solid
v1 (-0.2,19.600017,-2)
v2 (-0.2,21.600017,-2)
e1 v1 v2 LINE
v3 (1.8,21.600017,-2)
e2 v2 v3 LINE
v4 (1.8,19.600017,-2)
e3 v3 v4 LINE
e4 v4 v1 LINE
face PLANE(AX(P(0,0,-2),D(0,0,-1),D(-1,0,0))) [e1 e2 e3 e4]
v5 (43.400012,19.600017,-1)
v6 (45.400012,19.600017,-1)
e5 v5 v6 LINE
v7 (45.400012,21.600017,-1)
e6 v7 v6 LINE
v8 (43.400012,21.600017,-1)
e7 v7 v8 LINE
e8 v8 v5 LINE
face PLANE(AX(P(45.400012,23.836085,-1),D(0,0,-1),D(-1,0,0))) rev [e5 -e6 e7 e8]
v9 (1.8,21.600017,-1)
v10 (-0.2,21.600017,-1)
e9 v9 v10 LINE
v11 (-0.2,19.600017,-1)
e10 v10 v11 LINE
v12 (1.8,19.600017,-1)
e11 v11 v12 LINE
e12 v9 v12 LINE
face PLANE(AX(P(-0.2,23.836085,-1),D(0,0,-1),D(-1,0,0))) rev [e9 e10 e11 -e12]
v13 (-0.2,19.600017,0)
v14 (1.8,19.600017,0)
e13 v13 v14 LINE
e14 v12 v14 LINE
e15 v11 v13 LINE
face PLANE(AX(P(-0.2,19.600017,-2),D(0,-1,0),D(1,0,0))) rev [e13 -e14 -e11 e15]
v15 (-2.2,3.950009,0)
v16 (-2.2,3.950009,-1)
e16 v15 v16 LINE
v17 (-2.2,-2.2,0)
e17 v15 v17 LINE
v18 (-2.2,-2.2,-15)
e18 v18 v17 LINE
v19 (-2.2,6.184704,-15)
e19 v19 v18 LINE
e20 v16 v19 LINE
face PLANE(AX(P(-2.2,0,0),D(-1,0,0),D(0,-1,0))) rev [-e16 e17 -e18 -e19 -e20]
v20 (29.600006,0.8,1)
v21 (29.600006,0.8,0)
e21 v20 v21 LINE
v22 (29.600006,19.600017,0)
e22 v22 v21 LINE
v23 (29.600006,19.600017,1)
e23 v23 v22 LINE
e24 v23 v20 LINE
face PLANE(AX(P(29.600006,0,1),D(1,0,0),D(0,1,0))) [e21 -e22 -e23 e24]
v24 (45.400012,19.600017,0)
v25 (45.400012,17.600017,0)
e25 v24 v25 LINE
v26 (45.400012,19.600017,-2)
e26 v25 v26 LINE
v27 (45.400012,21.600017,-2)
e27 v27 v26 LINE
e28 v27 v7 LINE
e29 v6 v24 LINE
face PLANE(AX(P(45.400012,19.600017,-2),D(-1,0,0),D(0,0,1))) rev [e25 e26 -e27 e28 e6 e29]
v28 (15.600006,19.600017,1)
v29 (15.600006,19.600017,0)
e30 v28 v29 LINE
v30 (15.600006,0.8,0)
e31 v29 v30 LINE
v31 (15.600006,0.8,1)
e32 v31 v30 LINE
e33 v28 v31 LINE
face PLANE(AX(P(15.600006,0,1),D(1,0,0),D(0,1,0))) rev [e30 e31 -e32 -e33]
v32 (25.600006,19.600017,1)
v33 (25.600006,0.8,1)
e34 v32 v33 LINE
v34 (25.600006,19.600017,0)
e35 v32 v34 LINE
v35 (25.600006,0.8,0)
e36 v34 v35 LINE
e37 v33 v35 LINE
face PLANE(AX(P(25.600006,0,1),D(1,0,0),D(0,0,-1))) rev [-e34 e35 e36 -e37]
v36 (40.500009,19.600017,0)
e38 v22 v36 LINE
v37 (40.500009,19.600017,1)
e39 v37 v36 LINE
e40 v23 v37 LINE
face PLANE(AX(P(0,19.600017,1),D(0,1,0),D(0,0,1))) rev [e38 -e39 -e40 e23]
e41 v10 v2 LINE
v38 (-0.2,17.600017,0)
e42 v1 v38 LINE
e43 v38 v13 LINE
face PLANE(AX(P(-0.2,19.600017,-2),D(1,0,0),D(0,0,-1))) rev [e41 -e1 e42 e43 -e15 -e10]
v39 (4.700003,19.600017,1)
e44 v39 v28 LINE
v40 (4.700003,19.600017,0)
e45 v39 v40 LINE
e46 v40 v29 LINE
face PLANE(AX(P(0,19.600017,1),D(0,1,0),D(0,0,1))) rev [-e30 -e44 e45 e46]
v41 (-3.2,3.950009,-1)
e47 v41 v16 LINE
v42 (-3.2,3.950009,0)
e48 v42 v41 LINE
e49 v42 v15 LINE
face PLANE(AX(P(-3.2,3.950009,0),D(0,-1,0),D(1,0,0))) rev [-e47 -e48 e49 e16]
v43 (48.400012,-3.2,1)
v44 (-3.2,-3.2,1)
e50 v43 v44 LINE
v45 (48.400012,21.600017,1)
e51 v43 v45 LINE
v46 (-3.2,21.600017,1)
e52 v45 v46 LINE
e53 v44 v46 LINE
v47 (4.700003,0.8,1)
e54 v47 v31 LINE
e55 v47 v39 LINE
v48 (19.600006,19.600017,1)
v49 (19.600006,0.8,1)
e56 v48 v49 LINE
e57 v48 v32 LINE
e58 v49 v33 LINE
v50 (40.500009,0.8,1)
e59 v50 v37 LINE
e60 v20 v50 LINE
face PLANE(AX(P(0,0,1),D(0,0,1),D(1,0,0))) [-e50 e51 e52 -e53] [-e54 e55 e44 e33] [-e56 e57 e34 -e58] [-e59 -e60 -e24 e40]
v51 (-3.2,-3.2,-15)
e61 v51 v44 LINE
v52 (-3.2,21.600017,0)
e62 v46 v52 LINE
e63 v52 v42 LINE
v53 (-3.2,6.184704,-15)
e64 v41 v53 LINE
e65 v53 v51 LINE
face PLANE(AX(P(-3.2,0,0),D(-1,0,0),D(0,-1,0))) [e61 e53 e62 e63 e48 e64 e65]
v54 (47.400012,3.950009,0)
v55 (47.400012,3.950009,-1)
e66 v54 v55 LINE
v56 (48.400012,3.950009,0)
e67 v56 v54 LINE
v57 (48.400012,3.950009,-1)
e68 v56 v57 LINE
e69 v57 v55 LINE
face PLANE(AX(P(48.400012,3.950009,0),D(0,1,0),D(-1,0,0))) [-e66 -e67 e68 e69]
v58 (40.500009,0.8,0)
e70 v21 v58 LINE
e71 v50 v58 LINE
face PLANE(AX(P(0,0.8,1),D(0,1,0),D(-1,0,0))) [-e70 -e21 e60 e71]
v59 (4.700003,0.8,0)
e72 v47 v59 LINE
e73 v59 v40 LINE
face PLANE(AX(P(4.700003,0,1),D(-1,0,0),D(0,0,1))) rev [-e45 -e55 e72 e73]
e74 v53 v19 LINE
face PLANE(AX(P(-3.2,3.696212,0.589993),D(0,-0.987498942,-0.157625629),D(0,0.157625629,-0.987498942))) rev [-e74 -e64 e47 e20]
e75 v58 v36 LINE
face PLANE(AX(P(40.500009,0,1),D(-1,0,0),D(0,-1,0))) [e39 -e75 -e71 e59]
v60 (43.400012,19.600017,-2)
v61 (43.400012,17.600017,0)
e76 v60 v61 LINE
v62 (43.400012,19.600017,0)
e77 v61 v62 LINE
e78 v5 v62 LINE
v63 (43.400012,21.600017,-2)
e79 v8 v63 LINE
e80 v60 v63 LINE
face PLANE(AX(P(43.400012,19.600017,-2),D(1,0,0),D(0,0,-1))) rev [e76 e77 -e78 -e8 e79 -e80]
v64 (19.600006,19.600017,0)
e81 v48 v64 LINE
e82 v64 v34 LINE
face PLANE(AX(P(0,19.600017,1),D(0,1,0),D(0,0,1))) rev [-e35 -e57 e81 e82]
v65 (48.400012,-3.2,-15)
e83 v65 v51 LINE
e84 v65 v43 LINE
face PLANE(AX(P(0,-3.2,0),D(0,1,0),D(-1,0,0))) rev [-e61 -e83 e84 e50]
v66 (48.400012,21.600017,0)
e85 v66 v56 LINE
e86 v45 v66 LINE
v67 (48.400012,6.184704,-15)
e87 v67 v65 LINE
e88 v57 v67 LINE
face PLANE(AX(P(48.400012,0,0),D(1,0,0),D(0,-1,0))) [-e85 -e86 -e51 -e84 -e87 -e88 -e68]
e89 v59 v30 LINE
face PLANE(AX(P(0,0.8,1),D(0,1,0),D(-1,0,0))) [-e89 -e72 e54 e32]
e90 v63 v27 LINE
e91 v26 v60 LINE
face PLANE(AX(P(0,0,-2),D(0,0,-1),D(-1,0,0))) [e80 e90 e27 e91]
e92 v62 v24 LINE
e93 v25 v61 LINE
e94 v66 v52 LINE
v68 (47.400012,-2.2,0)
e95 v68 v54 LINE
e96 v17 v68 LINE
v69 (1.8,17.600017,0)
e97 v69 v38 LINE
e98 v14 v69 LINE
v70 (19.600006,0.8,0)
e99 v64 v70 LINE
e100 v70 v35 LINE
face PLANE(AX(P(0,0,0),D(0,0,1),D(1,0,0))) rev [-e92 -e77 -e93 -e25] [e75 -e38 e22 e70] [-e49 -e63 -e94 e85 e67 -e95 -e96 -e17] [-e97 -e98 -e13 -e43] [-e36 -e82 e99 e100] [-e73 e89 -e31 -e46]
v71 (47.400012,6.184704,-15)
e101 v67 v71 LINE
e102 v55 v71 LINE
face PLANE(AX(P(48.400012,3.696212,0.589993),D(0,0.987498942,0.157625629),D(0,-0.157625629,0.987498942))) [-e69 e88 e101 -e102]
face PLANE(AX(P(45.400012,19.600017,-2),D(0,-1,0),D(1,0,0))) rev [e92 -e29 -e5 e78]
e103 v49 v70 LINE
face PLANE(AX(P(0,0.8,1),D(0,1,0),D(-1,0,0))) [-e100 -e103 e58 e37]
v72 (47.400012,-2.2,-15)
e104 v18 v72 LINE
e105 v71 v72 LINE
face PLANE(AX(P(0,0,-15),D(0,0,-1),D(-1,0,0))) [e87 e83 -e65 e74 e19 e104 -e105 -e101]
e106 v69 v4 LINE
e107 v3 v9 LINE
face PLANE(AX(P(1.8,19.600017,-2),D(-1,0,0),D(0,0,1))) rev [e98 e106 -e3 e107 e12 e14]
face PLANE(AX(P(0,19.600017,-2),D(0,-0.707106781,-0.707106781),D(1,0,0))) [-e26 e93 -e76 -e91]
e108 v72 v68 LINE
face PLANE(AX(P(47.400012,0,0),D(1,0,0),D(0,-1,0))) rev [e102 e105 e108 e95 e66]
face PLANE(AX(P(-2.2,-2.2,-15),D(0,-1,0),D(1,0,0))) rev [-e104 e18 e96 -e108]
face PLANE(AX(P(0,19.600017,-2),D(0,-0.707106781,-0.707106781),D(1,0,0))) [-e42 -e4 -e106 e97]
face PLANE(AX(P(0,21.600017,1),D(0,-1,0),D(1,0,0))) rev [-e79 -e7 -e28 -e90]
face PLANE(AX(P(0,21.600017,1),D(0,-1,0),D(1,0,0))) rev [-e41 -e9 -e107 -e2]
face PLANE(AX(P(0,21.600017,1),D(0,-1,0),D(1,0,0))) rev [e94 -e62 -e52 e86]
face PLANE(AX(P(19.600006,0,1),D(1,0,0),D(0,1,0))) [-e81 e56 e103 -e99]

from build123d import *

# Parameters (mm, degrees)
SKETCH_2_W      = 49.600012207
SKETCH_2_H      = 22.800017408
SKETCH_2_W_2    = 10.900003052
SKETCH_2_H_2    = 18.800017408
SKETCH_2_W_3    = 6
SKETCH_2_W_4    = 10.900003051
EXTRUDE_1_DEPTH = 1
SKETCH_4_W      = 49.600012207
SKETCH_4_H      = 1
EXTRUDE_2_DEPTH = 2
SKETCH_5_W      = 49.600012207
SKETCH_5_H      = 1
EXTRUDE_3_DEPTH = 15
SKETCH_6_W      = 1
SKETCH_6_H      = 17.650008704
EXTRUDE_6_DEPTH = 1
SKETCH_7_W      = 2
SKETCH_7_H      = 2
EXTRUDE_7_DEPTH = 2
SKETCH_8_W      = 2
SKETCH_8_H      = 1
EXTRUDE_8_DEPTH = 2
CHAMFER_1_SIZE  = 2


with BuildPart() as part:
    # Эскиз2 → Бобышка-Вытянуть1 (new body)
    with BuildSketch(Plane.XY):
        with Locations((22.600006104, 10.200008704)):
            Rectangle(SKETCH_2_W, SKETCH_2_H)
        with Locations((10.150004578, 10.200008704)):
            Rectangle(SKETCH_2_W_2, SKETCH_2_H_2, mode=Mode.SUBTRACT)
        with Locations((22.600006104, 10.200008704)):
            Rectangle(SKETCH_2_W_3, SKETCH_2_H_2, mode=Mode.SUBTRACT)
        with Locations((35.05000763, 10.200008704)):
            Rectangle(SKETCH_2_W_4, SKETCH_2_H_2, mode=Mode.SUBTRACT)
    extrude(amount=EXTRUDE_1_DEPTH)

    # Эскиз4 → Бобышка-Вытянуть2 (add)
    with BuildSketch(Plane.XZ.offset(1.2)):
        with Locations((22.600006104, 0.5)):
            Rectangle(SKETCH_4_W, SKETCH_4_H)
    extrude(amount=EXTRUDE_2_DEPTH)

    # Эскиз5 → Бобышка-Вытянуть3 (add)
    with BuildSketch(Plane(origin=(0, 0, 0), x_dir=(-1, 0, 0), z_dir=(0, 0, -1))):
        with Locations((-22.600006104, -2.7)):
            Rectangle(SKETCH_5_W, SKETCH_5_H)
    extrude(amount=EXTRUDE_3_DEPTH)

    # Эскиз6 → Бобышка-Вытянуть6 (add)
    with BuildSketch(Plane.ZY.offset(2.2)):
        with Locations((0.5, 12.775013056)):
            Rectangle(SKETCH_6_W, SKETCH_6_H)
        Polygon((1, 3.950008704), (0, 3.950008704), (0, -2.2), (-15, -2.2), (-15, -3.2), (1, -3.2), align=None)
        Polygon((0, -2.2), (0, 3.950008704), (-1, 3.950008704), (-15, 6.184703554), (-15, -2.2), align=None)
    extrude_6 = extrude(amount=EXTRUDE_6_DEPTH)

    # Зеркальное отражение1: Бобышка-Вытянуть6 across plane
    add(extrude_6.mirror(Plane.ZY.offset(-22.600006104)))

    # Эскиз7 → Бобышка-Вытянуть7 (add)
    with BuildSketch(Plane(origin=(0, 0, 0), x_dir=(-1, 0, 0), z_dir=(0, 0, -1))):
        with Locations((-44.400012207, 18.600017408)):
            Rectangle(SKETCH_7_W, SKETCH_7_H)
        with Locations((-0.8, 18.600017408)):
            Rectangle(SKETCH_7_W, SKETCH_7_H)
    extrude(amount=EXTRUDE_7_DEPTH)

    # Эскиз8 → Бобышка-Вытянуть8 (add)
    with BuildSketch(Plane(origin=(0, 19.600017408, 0), x_dir=(1, 0, 0), z_dir=(0, 1, 0))):
        with Locations((0.8, 1.5)):
            Rectangle(SKETCH_8_W, SKETCH_8_H)
        with Locations((44.400012207, 1.5)):
            Rectangle(SKETCH_8_W, SKETCH_8_H)
    extrude(amount=EXTRUDE_8_DEPTH)

    # Фаска1
    chamfer_1_edges = [part.edges().sort_by_distance(p)[0] for p in [
        (0.8, 17.600017408, -2),
        (44.400012207, 17.600017408, -2),
    ]]
    chamfer(chamfer_1_edges, length=CHAMFER_1_SIZE - 0.0001)  # a hair under: the kernel refuses the full size


solid = part.part
